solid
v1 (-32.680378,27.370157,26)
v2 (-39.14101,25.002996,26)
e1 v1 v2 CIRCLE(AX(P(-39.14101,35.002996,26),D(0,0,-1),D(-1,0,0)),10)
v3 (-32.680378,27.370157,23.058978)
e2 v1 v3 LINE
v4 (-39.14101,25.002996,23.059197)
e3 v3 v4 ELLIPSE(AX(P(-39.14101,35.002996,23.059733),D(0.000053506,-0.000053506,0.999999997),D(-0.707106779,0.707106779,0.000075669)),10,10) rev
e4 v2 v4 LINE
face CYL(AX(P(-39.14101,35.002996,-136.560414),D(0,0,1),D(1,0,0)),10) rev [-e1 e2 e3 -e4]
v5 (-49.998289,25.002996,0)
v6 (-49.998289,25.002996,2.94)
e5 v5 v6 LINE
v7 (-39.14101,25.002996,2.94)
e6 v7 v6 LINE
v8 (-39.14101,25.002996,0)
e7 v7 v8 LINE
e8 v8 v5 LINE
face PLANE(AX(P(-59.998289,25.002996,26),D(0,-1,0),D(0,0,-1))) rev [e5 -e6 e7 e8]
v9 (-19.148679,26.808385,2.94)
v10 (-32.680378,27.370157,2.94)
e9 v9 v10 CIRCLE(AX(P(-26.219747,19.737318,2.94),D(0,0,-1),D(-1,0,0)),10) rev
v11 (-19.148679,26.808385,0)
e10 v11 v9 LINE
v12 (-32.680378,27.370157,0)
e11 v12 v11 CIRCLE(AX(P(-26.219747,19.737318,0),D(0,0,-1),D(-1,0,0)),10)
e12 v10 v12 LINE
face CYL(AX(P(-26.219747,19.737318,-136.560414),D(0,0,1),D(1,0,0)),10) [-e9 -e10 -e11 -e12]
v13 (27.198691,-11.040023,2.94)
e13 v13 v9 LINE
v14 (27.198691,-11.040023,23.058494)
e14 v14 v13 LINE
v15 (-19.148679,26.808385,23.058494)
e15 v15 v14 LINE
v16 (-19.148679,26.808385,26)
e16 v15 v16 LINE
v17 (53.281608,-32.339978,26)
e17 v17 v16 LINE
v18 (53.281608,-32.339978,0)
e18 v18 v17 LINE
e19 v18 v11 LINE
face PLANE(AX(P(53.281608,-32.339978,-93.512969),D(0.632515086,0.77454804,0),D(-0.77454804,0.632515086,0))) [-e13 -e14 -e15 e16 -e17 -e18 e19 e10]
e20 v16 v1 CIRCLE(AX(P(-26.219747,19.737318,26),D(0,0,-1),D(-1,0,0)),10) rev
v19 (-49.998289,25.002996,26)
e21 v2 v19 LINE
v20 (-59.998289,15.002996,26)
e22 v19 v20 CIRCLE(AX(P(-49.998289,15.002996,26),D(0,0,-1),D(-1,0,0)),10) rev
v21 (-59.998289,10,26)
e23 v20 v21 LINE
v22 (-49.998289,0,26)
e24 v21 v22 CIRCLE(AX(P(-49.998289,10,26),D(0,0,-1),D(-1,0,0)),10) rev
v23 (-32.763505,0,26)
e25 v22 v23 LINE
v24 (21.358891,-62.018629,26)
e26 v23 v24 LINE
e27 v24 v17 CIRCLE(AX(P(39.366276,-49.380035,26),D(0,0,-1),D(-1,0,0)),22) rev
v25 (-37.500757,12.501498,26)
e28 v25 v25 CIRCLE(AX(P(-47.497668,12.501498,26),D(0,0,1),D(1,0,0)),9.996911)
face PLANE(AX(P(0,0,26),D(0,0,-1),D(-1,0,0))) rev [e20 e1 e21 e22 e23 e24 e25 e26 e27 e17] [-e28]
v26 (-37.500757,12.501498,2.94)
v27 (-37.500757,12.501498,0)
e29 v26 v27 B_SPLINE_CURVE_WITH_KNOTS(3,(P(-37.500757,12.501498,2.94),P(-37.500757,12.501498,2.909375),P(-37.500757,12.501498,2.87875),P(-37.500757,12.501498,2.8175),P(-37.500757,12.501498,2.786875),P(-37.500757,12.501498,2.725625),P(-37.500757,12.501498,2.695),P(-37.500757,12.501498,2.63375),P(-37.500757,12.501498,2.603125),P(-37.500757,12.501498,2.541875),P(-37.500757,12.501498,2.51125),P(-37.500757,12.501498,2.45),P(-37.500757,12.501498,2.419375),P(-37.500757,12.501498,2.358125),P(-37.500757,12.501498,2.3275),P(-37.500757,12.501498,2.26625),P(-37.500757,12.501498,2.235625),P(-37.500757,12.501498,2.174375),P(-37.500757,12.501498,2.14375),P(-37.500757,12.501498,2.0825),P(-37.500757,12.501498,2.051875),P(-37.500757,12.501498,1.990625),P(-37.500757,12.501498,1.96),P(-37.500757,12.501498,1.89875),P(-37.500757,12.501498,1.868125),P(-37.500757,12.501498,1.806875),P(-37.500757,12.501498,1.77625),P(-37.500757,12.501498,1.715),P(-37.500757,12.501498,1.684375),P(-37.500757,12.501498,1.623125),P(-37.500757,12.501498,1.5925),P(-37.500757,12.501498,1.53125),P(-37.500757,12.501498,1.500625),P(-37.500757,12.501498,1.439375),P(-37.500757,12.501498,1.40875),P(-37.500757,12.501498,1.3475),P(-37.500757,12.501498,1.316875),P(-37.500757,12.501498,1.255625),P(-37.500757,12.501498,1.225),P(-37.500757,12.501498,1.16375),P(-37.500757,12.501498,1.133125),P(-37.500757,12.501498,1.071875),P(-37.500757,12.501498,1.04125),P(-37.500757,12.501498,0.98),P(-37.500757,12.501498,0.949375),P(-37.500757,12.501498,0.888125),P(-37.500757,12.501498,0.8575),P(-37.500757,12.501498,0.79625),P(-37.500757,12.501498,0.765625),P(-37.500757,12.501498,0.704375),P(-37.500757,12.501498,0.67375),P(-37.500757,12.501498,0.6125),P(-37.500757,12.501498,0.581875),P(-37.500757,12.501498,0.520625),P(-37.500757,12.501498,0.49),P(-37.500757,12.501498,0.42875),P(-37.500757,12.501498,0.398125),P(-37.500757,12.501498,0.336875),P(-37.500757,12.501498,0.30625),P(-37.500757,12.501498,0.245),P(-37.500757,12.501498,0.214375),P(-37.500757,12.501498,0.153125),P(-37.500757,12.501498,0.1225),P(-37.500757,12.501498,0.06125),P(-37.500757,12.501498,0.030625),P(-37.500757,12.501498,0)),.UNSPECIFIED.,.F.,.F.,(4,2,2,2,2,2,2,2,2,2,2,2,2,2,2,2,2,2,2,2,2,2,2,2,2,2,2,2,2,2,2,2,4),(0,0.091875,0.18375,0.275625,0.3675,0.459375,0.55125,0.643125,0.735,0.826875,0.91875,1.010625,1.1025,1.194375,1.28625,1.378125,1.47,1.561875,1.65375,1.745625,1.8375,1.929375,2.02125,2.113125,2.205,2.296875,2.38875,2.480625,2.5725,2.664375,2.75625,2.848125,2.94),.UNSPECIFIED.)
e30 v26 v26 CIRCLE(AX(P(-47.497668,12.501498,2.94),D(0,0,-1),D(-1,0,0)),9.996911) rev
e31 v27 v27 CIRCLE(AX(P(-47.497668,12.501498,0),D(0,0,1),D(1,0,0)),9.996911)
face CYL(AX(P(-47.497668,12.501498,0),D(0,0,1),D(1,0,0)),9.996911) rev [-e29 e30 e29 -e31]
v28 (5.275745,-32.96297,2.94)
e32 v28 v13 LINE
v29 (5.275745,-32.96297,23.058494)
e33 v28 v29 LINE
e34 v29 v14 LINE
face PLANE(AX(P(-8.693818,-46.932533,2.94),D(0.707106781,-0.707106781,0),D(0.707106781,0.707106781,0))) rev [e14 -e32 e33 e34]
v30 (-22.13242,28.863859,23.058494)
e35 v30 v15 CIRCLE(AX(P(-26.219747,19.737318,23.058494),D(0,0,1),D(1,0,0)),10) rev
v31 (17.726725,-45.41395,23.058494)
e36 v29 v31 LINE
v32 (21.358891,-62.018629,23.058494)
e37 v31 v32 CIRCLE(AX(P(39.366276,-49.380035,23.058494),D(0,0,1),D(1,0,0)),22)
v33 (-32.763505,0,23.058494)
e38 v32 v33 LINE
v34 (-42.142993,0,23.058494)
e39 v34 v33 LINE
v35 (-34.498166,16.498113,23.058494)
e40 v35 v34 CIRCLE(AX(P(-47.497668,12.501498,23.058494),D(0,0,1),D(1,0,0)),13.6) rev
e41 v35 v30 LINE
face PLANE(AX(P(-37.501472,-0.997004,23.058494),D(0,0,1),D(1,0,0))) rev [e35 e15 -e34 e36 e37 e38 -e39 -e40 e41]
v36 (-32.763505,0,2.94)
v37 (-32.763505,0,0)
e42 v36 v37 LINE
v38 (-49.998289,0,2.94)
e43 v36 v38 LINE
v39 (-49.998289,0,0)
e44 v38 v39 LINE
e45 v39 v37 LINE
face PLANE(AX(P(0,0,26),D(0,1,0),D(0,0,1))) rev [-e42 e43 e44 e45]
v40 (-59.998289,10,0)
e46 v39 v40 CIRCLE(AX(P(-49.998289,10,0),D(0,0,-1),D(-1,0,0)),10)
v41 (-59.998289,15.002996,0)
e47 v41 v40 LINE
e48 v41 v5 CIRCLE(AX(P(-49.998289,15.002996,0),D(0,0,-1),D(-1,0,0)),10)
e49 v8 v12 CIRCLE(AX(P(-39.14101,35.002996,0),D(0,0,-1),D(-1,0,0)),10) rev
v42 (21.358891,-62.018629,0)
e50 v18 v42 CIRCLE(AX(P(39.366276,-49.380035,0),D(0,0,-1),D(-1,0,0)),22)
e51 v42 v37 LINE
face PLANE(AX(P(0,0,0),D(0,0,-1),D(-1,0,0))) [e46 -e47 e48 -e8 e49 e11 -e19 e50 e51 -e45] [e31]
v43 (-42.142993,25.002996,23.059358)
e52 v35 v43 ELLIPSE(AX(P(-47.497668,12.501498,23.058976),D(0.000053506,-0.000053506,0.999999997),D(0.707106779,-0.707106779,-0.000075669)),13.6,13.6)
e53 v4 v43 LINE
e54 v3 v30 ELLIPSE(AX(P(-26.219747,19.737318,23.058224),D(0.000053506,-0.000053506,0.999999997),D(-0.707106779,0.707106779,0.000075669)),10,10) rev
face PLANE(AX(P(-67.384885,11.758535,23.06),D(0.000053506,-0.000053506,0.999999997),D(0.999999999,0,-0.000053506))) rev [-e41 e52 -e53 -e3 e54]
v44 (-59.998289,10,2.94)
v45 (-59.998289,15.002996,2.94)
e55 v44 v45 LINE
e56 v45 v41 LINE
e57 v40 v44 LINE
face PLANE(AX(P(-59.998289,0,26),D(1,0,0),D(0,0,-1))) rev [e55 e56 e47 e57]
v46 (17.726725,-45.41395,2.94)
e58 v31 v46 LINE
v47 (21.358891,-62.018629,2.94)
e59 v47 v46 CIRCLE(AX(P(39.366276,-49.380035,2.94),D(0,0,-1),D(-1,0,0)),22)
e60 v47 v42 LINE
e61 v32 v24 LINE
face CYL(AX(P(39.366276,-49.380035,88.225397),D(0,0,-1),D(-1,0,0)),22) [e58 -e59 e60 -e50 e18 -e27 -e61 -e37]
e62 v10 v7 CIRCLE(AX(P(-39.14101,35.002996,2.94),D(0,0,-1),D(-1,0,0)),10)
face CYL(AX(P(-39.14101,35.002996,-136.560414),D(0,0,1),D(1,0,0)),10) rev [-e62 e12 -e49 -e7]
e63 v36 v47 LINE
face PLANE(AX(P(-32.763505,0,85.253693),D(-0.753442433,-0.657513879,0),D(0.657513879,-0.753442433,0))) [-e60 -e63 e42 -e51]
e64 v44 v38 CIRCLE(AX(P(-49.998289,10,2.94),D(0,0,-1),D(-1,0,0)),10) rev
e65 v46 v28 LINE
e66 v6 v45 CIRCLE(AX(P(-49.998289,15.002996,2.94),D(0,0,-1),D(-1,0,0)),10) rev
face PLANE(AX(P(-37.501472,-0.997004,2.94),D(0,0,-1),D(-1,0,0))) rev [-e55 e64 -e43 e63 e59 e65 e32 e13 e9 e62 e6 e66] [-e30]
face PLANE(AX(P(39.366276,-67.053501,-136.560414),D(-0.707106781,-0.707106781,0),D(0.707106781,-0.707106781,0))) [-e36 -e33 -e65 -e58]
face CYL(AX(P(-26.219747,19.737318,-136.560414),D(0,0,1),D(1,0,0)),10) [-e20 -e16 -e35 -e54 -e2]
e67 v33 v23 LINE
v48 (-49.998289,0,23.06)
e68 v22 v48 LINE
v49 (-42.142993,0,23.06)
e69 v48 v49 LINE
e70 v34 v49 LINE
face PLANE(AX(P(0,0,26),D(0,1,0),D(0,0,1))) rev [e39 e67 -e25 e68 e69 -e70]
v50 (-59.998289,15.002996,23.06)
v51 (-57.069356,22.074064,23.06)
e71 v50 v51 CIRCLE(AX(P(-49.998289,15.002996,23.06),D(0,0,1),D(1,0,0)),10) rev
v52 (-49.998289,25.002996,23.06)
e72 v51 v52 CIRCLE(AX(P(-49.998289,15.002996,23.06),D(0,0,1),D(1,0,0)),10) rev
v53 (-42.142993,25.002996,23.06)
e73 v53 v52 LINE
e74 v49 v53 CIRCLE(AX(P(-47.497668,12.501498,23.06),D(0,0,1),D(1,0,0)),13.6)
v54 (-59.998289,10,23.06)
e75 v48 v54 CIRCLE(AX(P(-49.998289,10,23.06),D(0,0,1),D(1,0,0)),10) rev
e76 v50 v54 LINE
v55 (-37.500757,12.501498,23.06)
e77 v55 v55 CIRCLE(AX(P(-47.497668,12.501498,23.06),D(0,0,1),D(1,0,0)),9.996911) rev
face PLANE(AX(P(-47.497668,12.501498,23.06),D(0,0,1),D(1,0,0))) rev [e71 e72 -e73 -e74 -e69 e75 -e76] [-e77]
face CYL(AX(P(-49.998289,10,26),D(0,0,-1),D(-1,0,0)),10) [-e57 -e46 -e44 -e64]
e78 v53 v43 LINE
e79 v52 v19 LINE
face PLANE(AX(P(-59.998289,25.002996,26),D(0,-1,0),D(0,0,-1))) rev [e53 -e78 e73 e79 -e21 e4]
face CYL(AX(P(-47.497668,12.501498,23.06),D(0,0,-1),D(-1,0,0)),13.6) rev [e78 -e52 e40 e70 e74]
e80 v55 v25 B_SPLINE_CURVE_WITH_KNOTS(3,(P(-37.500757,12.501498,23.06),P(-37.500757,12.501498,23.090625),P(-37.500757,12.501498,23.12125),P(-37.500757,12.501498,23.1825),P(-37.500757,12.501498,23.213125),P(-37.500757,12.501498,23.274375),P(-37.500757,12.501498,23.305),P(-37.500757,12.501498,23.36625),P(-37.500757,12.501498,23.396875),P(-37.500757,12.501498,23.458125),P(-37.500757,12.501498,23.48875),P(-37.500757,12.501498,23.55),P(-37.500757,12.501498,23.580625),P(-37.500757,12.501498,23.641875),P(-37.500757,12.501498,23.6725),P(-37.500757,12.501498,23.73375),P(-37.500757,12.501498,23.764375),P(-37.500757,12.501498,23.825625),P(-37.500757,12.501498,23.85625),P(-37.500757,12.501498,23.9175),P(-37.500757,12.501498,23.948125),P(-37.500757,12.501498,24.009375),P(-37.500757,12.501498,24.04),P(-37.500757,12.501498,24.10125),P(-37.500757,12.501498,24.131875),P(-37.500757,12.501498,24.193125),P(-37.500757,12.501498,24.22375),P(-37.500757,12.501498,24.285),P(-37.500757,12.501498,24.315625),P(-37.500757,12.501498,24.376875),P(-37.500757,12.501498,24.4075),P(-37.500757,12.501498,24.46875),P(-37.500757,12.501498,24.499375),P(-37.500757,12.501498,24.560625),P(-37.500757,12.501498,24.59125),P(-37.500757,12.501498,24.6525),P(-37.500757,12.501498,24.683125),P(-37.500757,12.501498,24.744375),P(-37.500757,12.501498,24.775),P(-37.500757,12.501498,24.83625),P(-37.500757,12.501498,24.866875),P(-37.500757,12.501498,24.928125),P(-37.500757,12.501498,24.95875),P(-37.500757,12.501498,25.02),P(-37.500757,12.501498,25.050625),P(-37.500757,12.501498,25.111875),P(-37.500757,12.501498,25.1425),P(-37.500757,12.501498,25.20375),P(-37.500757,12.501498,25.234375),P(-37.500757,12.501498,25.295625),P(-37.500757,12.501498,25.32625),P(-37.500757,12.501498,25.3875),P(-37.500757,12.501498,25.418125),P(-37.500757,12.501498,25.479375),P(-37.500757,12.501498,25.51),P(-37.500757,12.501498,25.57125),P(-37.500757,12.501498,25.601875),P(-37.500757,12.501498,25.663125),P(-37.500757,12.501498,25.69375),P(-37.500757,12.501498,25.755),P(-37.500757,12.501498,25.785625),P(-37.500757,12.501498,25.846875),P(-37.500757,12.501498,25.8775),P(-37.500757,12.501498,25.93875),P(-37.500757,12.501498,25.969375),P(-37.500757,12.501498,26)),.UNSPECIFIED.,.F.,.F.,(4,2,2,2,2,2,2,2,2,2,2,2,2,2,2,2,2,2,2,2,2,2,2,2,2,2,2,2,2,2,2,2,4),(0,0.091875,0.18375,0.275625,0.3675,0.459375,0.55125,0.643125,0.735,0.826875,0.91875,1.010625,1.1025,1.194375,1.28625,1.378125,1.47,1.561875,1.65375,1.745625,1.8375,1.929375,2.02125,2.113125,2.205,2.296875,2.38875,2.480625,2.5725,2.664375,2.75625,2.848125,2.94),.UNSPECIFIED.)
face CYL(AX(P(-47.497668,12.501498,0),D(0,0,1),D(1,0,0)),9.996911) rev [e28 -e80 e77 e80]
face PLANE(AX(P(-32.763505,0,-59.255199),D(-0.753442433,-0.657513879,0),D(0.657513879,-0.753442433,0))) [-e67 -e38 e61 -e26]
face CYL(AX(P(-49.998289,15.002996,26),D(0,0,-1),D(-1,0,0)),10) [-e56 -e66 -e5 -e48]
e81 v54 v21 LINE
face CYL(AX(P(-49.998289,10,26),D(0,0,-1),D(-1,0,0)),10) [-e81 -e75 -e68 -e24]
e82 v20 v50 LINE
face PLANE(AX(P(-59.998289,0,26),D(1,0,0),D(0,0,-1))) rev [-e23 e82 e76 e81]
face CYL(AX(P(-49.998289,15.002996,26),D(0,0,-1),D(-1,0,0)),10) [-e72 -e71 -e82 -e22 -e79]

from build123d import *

# Parameters (mm, degrees)
EXTRUDE_1_DEPTH      = 26
SKETCH_4_R           = 9.996910884
CUT_EXTRUDE_2_DEPTH  = 26
FILLET_1_R           = 10
FILLET_2_R           = 10
CUT_EXTRUDE_4_DEPTH  = 26
SKETCH_8_R           = 13.6
CUT_EXTRUDE_5_DEPTH  = 20.12
EXTRUDE_2_DEPTH      = 26
FILLET_3_R           = 3
CUT_EXTRUDE_6_DEPTH  = 30
FILLET_9_R           = 10
FILLET_10_R          = 3
FILLET_11_R          = 10
CUT_EXTRUDE_7_DEPTH  = 30
SKETCH_13_W          = 20.118493956
SKETCH_13_H          = 70
CUT_EXTRUDE_8_DEPTH  = 44.75
CUT_EXTRUDE_9_DEPTH  = 44.75
SKETCH_15_R          = 22
EXTRUDE_3_DEPTH      = 26
EXTRUDE_4_REACH      = 99.657
CUT_EXTRUDE_13_DEPTH = 20
EXTRUDE_START        = -2.941506044
EXTRUDE_5_DEPTH      = 2.941506044
EXTRUDE_6_DEPTH      = 2.94


with BuildPart() as part:
    # 草图1 → 凸台-拉伸1 (new body)
    with BuildSketch(Plane.XY):
        Polygon((0, 0), (60.004097951, 0), (60.004097951, 25.002996284), (-59.998288516, 25.002996284), (-59.998288516, 0), align=None)
    extrude(amount=EXTRUDE_1_DEPTH)

    # 草图4 → 切除-拉伸2 (cut)
    with BuildSketch(Plane.XY.offset(26)):
        with Locations((-47.497668288, 12.501498142)):
            Circle(SKETCH_4_R)
    extrude(amount=-CUT_EXTRUDE_2_DEPTH, mode=Mode.SUBTRACT)

    # 圆角1
    fillet_1_edges = [part.edges().sort_by_distance(p)[0] for p in [
        (-59.998288516, 25.002996284, 13),
    ]]
    fillet(fillet_1_edges, radius=FILLET_1_R)

    # 圆角2
    fillet_2_edges = [part.edges().sort_by_distance(p)[0] for p in [
        (-59.998288516, 0, 13),
    ]]
    fillet(fillet_2_edges, radius=FILLET_2_R)

    # 草图7 → 切除-拉伸4 (cut)
    with BuildSketch(Plane(origin=(0, 25.002996284, 0), x_dir=(1, 0, 0), z_dir=(0, 1, 0))):
        Polygon((-37.501471928, -23.058493956), (-36.401101967, -23.058493956), (-36.401101967, -2.94), (-37.501471928, -2.94), (-62.053584156, -2.94), (-62.053584156, -23.058493956), align=None)
    extrude(amount=-CUT_EXTRUDE_4_DEPTH, mode=Mode.SUBTRACT)

    # 草图8 → 切除-拉伸5 (cut)
    with BuildSketch(Plane.XY.offset(2.94)):
        with Locations((-47.497668288, 12.501498142)):
            Circle(SKETCH_8_R)
    extrude(amount=CUT_EXTRUDE_5_DEPTH, mode=Mode.SUBTRACT)

    # 草图9 → 凸台-拉伸2 (add)
    with BuildSketch(Plane.XY.offset(26)):
        Polygon((-34.9988745, 25.002996284), (-22.500080712, 12.501498142), (-27.68722448, 0), (39.366276038, -67.053500518), (48.202948014, -58.216828542), (57.0397416, -49.380034956), (-17.34328964, 25.002996284), (-26.17108207, 33.830788714), align=None)
    extrude(amount=-EXTRUDE_2_DEPTH)

    # 圆角3
    fillet_3_edges = [part.edges().sort_by_distance(p)[0] for p in [
        (-36.401101967, 0, 12.999246978),
        (-36.401101967, 20.36446297, 12.999246978),
        (-36.401101967, 4.638533314, 12.999246978),
    ]]
    fillet(fillet_3_edges, radius=FILLET_3_R)

    # 草图10 → 切除-拉伸6 (cut)
    with BuildSketch(Plane.XY.offset(26)):
        Polygon((7.659706645, 0), (60.004097951, 0), (60.004097951, 25.002996284), (-17.34328964, 25.002996284), align=None)
    extrude(amount=-CUT_EXTRUDE_6_DEPTH, mode=Mode.SUBTRACT)

    # 圆角9
    # the kernel refuses this fillet: 10 mm, written as the material it adds along each edge
    with BuildSketch(Plane(origin=(-34.9988745, 25.002996284, 26), x_dir=(-1, 0, 0), z_dir=(0, 0, -1))) as fillet_9_piece_1_section:
        with BuildLine():
            CenterArc((FILLET_9_R * 0.414213562373, FILLET_9_R), FILLET_9_R, 225, 45)
            Line((-FILLET_9_R * 0.292893218813, FILLET_9_R * 0.292893218813), (0, 0))
            Line((0, 0), (FILLET_9_R * 0.414213562373, 0))
        make_face()
    fillet_9_piece_1 = extrude(amount=26, mode=Mode.PRIVATE)
    fillet_9_piece_1 = split(fillet_9_piece_1, bisect_by=Plane(origin=(-36.401101967, 24.986097048, 24.529246978), z_dir=(-1, 0, 0)), keep=Keep.TOP, mode=Mode.PRIVATE)
    fillet_9_piece_1 = split(fillet_9_piece_1, bisect_by=Plane(origin=(-37.504554949, 24.986097048, 23.058493956), z_dir=(0, 0, 1)), keep=Keep.TOP, mode=Mode.PRIVATE)
    add(fillet_9_piece_1)
    with BuildSketch(Plane(origin=(-34.9988745, 25.002996284, 26), x_dir=(-1, 0, 0), z_dir=(0, 0, -1))) as fillet_9_piece_2_section:
        with BuildLine():
            CenterArc((FILLET_9_R * 0.414213562373, FILLET_9_R), FILLET_9_R, 225, 45)
            Line((-FILLET_9_R * 0.292893218813, FILLET_9_R * 0.292893218813), (0, 0))
            Line((0, 0), (FILLET_9_R * 0.414213562373, 0))
        make_face()
    fillet_9_piece_2 = extrude(amount=26, mode=Mode.PRIVATE)
    fillet_9_piece_2 = split(fillet_9_piece_2, bisect_by=Plane(origin=(-36.401101967, 25.815006688, 24.529246978), z_dir=(1, 0, 0)), keep=Keep.TOP, mode=Mode.PRIVATE)
    fillet_9_piece_2 = split(fillet_9_piece_2, bisect_by=Plane(origin=(-34.567927652, 25.815006688, 23.058493956), z_dir=(0, 0, 1)), keep=Keep.TOP, mode=Mode.PRIVATE)
    add(fillet_9_piece_2)
    with BuildSketch(Plane(origin=(-34.9988745, 25.002996284, 26), x_dir=(-1, 0, 0), z_dir=(0, 0, -1))) as fillet_9_piece_3_section:
        with BuildLine():
            CenterArc((FILLET_9_R * 0.414213562373, FILLET_9_R), FILLET_9_R, 225, 45)
            Line((-FILLET_9_R * 0.292893218813, FILLET_9_R * 0.292893218813), (0, 0))
            Line((0, 0), (FILLET_9_R * 0.414213562373, 0))
        make_face()
    fillet_9_piece_3 = extrude(amount=26, mode=Mode.PRIVATE)
    fillet_9_piece_3 = split(fillet_9_piece_3, bisect_by=Plane(origin=(-34.567927652, 25.815006688, 2.94), z_dir=(0, 0, 1)), keep=Keep.TOP, mode=Mode.PRIVATE)
    fillet_9_piece_3 = split(fillet_9_piece_3, bisect_by=Plane(origin=(-36.401101967, 25.815006688, 12.999246978), z_dir=(1, 0, 0)), keep=Keep.TOP, mode=Mode.PRIVATE)
    fillet_9_piece_3 = split(fillet_9_piece_3, bisect_by=Plane(origin=(-34.567927652, 25.815006688, 23.058493956), z_dir=(0, 0, -1)), keep=Keep.TOP, mode=Mode.PRIVATE)
    add(fillet_9_piece_3)
    with BuildSketch(Plane(origin=(-34.9988745, 25.002996284, 26), x_dir=(-1, 0, 0), z_dir=(0, 0, -1))) as fillet_9_piece_4_section:
        with BuildLine():
            CenterArc((FILLET_9_R * 0.414213562373, FILLET_9_R), FILLET_9_R, 225, 45)
            Line((-FILLET_9_R * 0.292893218813, FILLET_9_R * 0.292893218813), (0, 0))
            Line((0, 0), (FILLET_9_R * 0.414213562373, 0))
        make_face()
    fillet_9_piece_4 = extrude(amount=26, mode=Mode.PRIVATE)
    fillet_9_piece_4 = split(fillet_9_piece_4, bisect_by=Plane(origin=(-37.504554949, 24.986097048, 2.94), z_dir=(0, 0, -1)), keep=Keep.TOP, mode=Mode.PRIVATE)
    fillet_9_piece_4 = split(fillet_9_piece_4, bisect_by=Plane(origin=(-36.401101967, 24.986097048, 1.47), z_dir=(-1, 0, 0)), keep=Keep.TOP, mode=Mode.PRIVATE)
    add(fillet_9_piece_4)
    with BuildSketch(Plane(origin=(-34.9988745, 25.002996284, 26), x_dir=(-1, 0, 0), z_dir=(0, 0, -1))) as fillet_9_piece_5_section:
        with BuildLine():
            CenterArc((FILLET_9_R * 0.414213562373, FILLET_9_R), FILLET_9_R, 225, 45)
            Line((-FILLET_9_R * 0.292893218813, FILLET_9_R * 0.292893218813), (0, 0))
            Line((0, 0), (FILLET_9_R * 0.414213562373, 0))
        make_face()
    fillet_9_piece_5 = extrude(amount=26, mode=Mode.PRIVATE)
    fillet_9_piece_5 = split(fillet_9_piece_5, bisect_by=Plane(origin=(-34.567927652, 25.815006688, 2.94), z_dir=(0, 0, -1)), keep=Keep.TOP, mode=Mode.PRIVATE)
    fillet_9_piece_5 = split(fillet_9_piece_5, bisect_by=Plane(origin=(-36.401101967, 25.815006688, 1.47), z_dir=(1, 0, 0)), keep=Keep.TOP, mode=Mode.PRIVATE)
    add(fillet_9_piece_5)

    # 圆角10
    fillet_10_edges = [part.edges().sort_by_distance(p)[0] for p in [
        (-36.401101967, 25.385673201, 12.999246978),
    ]]
    fillet(fillet_10_edges, radius=FILLET_10_R)

    # 圆角11
    fillet_11_edges = [part.edges().sort_by_distance(p)[0] for p in [
        (-26.17108207, 33.830788714, 13),
    ]]
    fillet(fillet_11_edges, radius=FILLET_11_R)

    # 草图12 → 切除-拉伸7 (cut)
    with BuildSketch(Plane(origin=(3.829853322, 3.829853322, 0), x_dir=(0, 0, -1), z_dir=(0.7071067811865404, 0.7071067811865547, 0))):
        Polygon((-12.999246978, 43.121170069), (-9.998089183, 43.121170069), (-9.998089183, 23.118852005), (-15.995491838, 23.118852005), (-15.995491838, 43.121170069), align=None)
    extrude(amount=-CUT_EXTRUDE_7_DEPTH, mode=Mode.SUBTRACT)

    # 草图13 → 切除-拉伸8 (cut, symmetric)
    with BuildSketch(Plane(origin=(3.829853322, 3.829853322, 0), x_dir=(0, 0, -1), z_dir=(0.7071067811865404, 0.7071067811865547, 0))):
        with Locations((-12.999246978, 7.961145372)):
            Rectangle(SKETCH_13_W, SKETCH_13_H)
    extrude(amount=CUT_EXTRUDE_8_DEPTH, both=True, mode=Mode.SUBTRACT)

    # 草图14 → 切除-拉伸9 (cut, symmetric)
    with BuildSketch(Plane(origin=(3.829853322, 3.829853322, 0), x_dir=(0, 0, -1), z_dir=(0.7071067811865404, 0.7071067811865547, 0))):
        Polygon((-23.06, 55.962849268), (-23.058493956, 36.05981453), (-2.94, 36.05981453), (-2.94, 55.962849268), align=None)
    extrude(amount=CUT_EXTRUDE_9_DEPTH, both=True, mode=Mode.SUBTRACT)

    # 草图15 → 凸台-拉伸3 (add)
    with BuildSketch(Plane(origin=(0, 0, 0), x_dir=(-1, 0, 0), z_dir=(0, 0, -1))):
        with Locations((-39.366276038, -49.380034956)):
            Circle(SKETCH_15_R)
    extrude(amount=-EXTRUDE_3_DEPTH)

    # 凸台-拉伸4: up to this face of the body (flat: up to its plane)
    extrude_4_end = Plane(part.part.faces().sort_by_distance((10.252727371, -21.880412524, 0))[0])
    # 草图16 → 凸台-拉伸4 (add, up to the picked face)
    with BuildSketch(Plane.XY.offset(26), mode=Mode.PRIVATE) as extrude_4_sk1:
        with BuildLine():
            Line((53.281607925, -32.339978076), (-19.148678719, 26.808385364))
            Line((-19.148678719, 26.808385364), (35.400190623, -27.740483979))
            ThreePointArc((35.400190623, -27.740483979), (44.846760764, -28.073597263), (53.281607925, -32.339978076))
        make_face()
    extrude_4_tool1 = split(extrude(extrude_4_sk1.sketch, amount=-EXTRUDE_4_REACH, mode=Mode.PRIVATE), bisect_by=extrude_4_end, keep=Keep.BOTH, mode=Mode.PRIVATE)
    add(extrude_4_tool1.solids().sort_by(Axis((21.577836, -9.730931, 26), (0, 0, -1)))[0])

    # 草图17 → 切除-拉伸13 (cut)
    with BuildSketch(Plane(origin=(3.829853322, 3.829853322, 0), x_dir=(0, 0, 1), z_dir=(-0.7071067811865404, -0.7071067811865548, 0))):
        Polygon((23.058493956, 32.496551656), (23.058493956, -27.038854628), (2.94, -27.038854628), (2.94, 32.428906565), (2.94, 35.354128857), (23.06, 35.354128857), align=None)
    extrude(amount=-CUT_EXTRUDE_13_DEPTH, mode=Mode.SUBTRACT)

    # 草图19 → 凸台-拉伸5 (add)
    with BuildSketch(Plane.XY.offset(26).offset(EXTRUDE_START)):
        with BuildLine():
            Line((-32.763505202, 0), (-27.68722448, 0))
            Line((-27.68722448, 0), (17.726725061, -45.413949541))
            ThreePointArc((17.726725061, -45.413949541), (17.874446419, -54.081232636), (21.358890569, -62.018629363))
            Line((21.358890569, -62.018629363), (-32.763505202, 0))
        make_face()
    extrude(amount=EXTRUDE_5_DEPTH)

    # 草图20 → 凸台-拉伸6 (add)
    with BuildSketch(Plane(origin=(0, 0, 0), x_dir=(-1, 0, 0), z_dir=(0, 0, -1))):
        with BuildLine():
            Line((-17.726725061, -45.413949541), (27.68722448, 0))
            Line((27.68722448, 0), (32.763505202, 0))
            Line((32.763505202, 0), (-21.358890569, -62.018629363))
            ThreePointArc((-21.358890569, -62.018629363), (-17.874446419, -54.081232636), (-17.726725061, -45.413949541))
        make_face()
    extrude(amount=-EXTRUDE_6_DEPTH)


solid = part.part
